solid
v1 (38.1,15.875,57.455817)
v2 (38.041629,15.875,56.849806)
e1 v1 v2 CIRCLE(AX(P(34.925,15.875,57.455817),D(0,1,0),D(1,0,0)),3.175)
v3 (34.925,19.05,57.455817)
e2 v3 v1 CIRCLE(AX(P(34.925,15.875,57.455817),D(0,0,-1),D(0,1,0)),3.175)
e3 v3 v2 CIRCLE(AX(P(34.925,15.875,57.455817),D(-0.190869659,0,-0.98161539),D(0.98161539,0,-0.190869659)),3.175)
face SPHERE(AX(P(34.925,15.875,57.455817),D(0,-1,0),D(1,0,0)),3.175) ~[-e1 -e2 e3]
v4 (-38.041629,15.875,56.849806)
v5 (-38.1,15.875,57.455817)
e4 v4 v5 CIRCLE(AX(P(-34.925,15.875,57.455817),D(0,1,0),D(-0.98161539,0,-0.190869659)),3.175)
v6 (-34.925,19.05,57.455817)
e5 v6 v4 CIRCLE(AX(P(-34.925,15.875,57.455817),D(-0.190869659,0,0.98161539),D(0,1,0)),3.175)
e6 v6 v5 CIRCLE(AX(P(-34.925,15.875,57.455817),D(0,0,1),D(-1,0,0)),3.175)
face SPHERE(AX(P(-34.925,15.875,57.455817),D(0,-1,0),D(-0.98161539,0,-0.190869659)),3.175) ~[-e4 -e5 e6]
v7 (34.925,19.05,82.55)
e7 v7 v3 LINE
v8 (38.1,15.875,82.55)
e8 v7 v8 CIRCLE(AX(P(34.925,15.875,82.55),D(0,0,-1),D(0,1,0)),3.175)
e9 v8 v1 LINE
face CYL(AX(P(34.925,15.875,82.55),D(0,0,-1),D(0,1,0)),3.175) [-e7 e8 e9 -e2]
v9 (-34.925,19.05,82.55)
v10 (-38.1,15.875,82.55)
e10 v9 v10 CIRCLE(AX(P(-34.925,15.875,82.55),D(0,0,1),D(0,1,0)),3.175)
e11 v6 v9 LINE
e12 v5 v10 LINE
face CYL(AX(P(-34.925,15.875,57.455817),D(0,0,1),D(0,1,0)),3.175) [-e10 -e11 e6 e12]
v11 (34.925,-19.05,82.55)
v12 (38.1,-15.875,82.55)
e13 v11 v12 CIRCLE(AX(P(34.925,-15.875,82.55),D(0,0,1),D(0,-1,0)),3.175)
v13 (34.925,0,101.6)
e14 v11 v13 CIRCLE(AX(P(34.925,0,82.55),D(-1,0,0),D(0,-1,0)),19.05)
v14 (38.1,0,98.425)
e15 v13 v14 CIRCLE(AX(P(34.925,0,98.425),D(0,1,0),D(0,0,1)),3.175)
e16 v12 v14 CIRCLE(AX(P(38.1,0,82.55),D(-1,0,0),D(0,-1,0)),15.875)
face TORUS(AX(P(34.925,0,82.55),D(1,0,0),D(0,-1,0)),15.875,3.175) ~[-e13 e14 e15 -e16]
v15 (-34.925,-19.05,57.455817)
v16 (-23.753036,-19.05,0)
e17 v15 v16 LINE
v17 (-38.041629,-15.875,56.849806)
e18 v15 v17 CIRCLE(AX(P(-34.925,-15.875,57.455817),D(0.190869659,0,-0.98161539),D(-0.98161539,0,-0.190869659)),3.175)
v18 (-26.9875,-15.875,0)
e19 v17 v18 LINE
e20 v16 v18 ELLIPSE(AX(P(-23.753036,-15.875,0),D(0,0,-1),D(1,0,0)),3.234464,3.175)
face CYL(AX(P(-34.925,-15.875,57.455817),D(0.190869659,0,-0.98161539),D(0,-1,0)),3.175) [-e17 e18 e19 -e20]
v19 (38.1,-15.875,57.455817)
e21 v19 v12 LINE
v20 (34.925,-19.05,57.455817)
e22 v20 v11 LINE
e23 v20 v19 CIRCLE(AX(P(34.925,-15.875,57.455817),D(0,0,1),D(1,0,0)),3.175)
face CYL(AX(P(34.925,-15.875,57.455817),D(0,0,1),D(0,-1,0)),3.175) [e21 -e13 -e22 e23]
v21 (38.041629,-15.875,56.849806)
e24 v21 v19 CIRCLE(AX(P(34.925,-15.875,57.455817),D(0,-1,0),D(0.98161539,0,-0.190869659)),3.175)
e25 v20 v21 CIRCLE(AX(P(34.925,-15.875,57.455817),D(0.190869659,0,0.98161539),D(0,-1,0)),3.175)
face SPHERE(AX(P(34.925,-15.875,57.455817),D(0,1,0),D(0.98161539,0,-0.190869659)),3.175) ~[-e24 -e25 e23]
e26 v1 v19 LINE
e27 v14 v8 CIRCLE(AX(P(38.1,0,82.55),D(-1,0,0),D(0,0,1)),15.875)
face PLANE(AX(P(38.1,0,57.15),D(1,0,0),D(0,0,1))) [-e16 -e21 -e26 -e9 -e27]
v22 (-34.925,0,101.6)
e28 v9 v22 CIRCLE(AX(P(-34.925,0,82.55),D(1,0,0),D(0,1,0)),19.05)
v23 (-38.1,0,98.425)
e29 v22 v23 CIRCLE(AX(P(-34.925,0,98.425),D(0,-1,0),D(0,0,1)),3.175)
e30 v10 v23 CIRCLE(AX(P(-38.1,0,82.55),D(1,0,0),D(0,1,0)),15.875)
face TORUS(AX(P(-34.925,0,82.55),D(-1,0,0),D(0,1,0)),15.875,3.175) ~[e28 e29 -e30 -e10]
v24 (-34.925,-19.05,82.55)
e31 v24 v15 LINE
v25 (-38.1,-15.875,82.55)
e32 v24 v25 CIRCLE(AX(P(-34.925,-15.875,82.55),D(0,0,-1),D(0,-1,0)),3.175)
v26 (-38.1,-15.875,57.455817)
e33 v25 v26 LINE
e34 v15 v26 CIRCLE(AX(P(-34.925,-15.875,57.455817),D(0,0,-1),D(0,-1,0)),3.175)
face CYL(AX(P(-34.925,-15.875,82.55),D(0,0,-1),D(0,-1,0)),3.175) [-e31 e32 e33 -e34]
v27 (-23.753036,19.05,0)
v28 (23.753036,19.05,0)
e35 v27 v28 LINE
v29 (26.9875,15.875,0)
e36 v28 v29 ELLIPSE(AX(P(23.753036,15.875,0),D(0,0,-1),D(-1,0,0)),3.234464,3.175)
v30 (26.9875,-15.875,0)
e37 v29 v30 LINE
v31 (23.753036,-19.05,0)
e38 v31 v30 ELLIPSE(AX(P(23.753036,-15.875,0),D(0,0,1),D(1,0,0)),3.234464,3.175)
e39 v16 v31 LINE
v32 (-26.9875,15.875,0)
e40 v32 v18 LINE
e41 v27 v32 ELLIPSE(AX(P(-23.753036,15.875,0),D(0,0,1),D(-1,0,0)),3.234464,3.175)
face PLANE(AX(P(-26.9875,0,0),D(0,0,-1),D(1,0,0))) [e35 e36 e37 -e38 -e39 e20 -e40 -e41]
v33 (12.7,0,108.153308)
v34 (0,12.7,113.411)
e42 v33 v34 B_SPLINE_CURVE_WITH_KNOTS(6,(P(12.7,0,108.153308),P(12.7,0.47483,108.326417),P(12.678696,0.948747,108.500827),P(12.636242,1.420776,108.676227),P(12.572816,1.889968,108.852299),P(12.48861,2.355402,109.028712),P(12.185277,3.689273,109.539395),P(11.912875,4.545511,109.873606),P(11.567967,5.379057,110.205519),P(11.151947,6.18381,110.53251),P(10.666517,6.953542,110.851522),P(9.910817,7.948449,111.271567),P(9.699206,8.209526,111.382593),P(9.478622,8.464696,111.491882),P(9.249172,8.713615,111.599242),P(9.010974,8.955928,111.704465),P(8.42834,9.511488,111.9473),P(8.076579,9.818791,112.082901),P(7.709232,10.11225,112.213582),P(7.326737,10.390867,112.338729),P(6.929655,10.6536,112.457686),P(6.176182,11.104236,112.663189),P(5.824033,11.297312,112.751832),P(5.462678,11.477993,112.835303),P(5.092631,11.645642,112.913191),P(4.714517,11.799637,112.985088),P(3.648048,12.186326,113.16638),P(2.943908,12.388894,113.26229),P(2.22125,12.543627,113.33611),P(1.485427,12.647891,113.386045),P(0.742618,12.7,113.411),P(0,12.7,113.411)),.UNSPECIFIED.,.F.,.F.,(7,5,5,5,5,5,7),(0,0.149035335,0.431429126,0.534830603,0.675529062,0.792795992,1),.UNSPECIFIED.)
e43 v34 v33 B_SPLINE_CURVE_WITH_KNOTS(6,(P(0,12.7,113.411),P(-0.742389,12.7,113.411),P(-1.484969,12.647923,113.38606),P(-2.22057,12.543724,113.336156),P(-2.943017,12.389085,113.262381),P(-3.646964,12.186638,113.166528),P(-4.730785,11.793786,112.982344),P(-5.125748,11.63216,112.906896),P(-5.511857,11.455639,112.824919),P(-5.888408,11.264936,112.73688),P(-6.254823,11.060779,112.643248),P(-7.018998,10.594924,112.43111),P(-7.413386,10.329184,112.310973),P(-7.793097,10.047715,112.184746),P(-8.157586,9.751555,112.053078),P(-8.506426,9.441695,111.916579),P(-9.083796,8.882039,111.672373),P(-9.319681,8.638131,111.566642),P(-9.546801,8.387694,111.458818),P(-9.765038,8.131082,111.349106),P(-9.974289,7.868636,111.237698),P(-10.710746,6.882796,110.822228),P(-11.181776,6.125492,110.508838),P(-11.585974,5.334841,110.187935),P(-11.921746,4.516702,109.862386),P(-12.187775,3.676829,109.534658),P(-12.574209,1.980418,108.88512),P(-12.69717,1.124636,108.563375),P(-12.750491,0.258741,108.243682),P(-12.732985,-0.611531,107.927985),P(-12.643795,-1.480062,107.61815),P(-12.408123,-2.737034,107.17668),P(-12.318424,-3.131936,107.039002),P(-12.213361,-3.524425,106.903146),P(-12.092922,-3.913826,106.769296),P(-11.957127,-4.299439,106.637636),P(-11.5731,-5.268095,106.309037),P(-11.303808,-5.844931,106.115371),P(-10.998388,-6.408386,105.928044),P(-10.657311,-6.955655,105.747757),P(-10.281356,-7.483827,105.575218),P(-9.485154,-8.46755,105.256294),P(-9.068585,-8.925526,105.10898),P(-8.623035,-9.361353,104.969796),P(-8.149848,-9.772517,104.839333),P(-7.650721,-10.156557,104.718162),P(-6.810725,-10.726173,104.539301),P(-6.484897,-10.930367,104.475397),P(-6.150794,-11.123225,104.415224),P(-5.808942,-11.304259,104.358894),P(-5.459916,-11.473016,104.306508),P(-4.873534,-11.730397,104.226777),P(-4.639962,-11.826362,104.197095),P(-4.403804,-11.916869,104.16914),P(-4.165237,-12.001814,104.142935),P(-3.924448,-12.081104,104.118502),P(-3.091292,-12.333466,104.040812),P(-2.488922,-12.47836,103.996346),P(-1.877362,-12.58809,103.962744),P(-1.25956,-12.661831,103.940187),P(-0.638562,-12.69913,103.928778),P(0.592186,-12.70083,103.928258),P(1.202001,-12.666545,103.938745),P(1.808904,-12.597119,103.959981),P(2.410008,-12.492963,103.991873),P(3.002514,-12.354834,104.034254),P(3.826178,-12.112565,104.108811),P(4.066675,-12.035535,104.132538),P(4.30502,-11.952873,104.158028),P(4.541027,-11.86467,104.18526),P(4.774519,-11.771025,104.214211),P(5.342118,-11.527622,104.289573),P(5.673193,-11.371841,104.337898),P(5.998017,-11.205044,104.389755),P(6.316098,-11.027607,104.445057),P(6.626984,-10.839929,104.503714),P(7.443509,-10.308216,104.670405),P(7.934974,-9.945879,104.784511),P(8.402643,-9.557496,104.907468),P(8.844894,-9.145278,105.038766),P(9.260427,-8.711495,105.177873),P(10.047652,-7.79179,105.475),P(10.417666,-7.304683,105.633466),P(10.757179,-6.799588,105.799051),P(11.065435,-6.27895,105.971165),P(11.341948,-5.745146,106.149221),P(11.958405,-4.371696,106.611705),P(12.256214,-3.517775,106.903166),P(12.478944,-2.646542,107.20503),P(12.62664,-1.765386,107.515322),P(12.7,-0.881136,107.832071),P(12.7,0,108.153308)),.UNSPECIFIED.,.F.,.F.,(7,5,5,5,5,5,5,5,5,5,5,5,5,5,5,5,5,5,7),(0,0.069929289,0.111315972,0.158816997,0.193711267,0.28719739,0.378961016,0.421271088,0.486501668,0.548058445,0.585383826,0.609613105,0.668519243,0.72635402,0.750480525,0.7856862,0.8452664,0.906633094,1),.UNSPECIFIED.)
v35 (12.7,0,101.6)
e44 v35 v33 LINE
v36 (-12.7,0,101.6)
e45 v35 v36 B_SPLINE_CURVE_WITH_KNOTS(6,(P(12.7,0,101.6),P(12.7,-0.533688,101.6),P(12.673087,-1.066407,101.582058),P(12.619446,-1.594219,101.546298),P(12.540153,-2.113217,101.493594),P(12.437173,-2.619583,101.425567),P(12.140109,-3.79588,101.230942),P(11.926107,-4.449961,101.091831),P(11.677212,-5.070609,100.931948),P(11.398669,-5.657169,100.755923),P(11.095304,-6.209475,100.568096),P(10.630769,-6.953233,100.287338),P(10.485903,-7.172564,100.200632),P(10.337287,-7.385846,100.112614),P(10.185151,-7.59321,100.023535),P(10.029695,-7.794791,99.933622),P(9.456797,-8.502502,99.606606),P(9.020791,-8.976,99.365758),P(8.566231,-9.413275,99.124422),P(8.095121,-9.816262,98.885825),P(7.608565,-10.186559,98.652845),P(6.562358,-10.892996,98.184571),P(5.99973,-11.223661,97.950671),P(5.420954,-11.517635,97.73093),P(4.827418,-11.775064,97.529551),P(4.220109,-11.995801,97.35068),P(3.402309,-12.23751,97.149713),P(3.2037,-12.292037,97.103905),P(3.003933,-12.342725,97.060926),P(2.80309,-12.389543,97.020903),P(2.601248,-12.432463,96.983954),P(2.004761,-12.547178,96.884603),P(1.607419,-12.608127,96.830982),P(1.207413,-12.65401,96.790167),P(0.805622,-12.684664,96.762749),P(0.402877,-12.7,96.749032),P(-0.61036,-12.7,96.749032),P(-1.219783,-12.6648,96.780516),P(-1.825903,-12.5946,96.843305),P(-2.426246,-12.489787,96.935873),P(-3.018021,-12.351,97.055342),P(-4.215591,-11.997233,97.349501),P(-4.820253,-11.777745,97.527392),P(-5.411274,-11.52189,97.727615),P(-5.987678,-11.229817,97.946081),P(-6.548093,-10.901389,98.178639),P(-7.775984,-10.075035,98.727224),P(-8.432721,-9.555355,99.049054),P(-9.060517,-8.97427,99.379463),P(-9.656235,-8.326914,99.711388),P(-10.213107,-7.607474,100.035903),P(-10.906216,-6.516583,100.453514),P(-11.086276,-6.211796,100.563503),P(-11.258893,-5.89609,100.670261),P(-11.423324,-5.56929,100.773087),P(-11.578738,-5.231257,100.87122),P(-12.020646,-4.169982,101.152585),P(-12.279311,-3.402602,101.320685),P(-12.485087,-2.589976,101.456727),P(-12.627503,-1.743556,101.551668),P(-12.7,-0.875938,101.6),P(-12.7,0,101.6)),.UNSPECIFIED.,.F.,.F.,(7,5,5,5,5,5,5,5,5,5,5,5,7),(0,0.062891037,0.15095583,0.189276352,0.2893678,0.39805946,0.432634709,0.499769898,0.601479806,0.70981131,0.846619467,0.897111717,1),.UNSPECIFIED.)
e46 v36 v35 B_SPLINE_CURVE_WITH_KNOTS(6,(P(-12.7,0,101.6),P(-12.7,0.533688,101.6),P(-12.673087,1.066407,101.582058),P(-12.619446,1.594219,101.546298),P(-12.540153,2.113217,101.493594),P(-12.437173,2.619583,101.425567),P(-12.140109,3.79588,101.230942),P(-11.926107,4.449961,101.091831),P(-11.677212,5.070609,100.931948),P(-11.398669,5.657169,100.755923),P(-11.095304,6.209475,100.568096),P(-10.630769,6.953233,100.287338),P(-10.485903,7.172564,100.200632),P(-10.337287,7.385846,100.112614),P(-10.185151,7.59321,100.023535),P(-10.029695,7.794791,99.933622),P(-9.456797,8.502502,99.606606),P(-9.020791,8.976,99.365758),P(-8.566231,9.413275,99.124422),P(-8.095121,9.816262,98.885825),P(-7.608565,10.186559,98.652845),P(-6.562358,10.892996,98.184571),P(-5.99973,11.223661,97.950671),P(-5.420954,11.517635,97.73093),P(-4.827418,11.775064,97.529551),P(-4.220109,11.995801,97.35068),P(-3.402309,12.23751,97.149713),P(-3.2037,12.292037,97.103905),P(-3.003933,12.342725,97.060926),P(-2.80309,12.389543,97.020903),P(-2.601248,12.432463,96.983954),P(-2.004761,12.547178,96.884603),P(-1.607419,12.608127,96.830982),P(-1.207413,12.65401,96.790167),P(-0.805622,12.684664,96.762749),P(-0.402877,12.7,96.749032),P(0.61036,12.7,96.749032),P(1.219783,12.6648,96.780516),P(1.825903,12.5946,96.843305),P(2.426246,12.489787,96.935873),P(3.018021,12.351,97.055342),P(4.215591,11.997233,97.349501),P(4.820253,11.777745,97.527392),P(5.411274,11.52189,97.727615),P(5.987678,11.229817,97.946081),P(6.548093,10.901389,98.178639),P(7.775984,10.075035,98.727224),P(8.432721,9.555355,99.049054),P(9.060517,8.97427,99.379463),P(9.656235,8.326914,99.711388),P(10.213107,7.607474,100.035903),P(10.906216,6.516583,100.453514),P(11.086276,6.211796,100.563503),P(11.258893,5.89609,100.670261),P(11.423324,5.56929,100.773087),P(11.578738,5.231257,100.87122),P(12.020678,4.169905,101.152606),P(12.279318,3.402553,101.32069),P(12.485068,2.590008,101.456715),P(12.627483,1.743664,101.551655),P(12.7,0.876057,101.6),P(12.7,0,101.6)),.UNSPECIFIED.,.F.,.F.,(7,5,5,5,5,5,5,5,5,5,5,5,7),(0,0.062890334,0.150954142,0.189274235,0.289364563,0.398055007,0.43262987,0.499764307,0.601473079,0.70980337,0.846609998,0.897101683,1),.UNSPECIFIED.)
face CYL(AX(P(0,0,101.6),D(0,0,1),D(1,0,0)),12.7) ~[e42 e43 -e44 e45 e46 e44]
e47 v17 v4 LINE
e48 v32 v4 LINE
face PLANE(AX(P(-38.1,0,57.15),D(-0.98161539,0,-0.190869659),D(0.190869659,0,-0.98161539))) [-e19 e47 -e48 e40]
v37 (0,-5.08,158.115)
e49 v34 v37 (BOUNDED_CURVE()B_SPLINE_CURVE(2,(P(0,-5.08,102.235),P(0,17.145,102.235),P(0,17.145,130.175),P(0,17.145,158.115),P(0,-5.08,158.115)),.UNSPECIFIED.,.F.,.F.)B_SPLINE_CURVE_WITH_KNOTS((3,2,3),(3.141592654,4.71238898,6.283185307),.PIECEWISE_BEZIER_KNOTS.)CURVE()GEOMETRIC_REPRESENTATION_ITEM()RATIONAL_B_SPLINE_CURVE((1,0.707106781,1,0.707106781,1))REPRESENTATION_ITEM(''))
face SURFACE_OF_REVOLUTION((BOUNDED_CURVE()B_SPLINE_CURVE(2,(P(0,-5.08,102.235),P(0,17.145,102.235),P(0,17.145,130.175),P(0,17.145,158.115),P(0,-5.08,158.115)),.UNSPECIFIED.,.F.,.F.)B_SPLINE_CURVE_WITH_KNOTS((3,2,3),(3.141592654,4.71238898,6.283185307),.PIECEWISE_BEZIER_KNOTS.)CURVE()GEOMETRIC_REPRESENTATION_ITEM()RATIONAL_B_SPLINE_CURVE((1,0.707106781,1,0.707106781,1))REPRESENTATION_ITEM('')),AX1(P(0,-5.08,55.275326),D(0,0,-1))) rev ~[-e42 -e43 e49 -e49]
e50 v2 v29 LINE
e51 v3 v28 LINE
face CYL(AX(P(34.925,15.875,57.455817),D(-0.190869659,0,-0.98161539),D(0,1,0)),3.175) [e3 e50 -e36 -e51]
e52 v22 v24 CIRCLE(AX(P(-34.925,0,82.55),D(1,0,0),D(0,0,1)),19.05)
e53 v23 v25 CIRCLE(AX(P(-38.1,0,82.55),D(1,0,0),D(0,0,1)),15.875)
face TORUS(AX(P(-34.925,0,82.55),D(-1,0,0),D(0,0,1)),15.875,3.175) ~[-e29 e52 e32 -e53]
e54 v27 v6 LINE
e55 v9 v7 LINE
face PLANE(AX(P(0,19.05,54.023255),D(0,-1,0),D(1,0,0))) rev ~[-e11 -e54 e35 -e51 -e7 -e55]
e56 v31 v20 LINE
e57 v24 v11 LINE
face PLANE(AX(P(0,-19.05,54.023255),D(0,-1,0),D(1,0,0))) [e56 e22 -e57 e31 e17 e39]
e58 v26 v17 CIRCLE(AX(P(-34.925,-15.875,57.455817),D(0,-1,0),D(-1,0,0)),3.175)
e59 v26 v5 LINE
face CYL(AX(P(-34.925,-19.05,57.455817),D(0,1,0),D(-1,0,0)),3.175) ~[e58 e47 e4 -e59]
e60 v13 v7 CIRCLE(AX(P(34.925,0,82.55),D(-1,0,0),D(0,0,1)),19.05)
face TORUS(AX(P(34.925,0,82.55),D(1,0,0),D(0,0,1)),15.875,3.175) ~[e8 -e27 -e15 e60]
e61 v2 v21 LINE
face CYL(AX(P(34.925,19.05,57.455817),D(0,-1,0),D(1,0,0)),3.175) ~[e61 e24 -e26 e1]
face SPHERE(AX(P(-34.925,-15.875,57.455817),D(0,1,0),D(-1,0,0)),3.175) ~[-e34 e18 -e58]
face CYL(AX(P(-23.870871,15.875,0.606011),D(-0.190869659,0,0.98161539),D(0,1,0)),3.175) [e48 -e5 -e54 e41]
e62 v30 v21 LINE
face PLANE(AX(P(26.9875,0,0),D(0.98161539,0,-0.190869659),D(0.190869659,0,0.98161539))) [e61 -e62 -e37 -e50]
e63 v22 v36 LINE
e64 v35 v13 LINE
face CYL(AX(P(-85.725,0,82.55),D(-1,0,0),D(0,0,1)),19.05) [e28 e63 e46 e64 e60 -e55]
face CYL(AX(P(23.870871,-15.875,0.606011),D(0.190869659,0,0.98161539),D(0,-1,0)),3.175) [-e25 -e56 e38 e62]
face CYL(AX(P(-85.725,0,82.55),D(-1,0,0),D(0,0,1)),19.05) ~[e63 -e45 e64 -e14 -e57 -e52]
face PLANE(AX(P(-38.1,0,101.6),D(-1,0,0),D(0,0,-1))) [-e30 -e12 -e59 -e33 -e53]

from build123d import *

# Parameters (mm, degrees)
F1_DEPTH    = 19.05
F2_T1_DEPTH = 171.45
F3_W        = 12.7
F3_H        = 38.1
F7_R        = 3.175
F8_R        = 3.175


# Not quite as in the source:
# - a fillet or chamfer that OpenCascade refuses, or shapes differently, is made with other operations: its cross-section is extruded or revolved along the edge and cut away or added


with BuildPart() as f1:
    # F0 (on Front) → F1 (new body, symmetric)
    with BuildSketch(Plane.XZ):
        Polygon((-38.1, 57.15), (-26.9875, 0), (26.9875, 0), (38.1, 57.15), (38.1, 101.6), (-38.1, 101.6), align=None)
    extrude(amount=F1_DEPTH, both=True)

    # F2: fillet of radius 19.05 on 2 edges, made by hand

    # F2_s2 → F2_t1 (cut)
    with BuildSketch(Plane.YZ.offset(-85.725)):
        with BuildLine():
            ThreePointArc((0, 101.6), (-13.4703841816, 96.0203841816), (-19.05, 82.55))
            Line((-19.05, 82.55), (-19.05, 101.6))
            Line((-19.05, 101.6), (0, 101.6))
        make_face()
        with BuildLine():
            ThreePointArc((0, 101.6), (13.4703841816, 96.0203841816), (19.05, 82.55))
            Line((19.05, 82.55), (19.05, 101.6))
            Line((19.05, 101.6), (0, 101.6))
        make_face()
    extrude(amount=F2_T1_DEPTH, mode=Mode.SUBTRACT)

    # F3 (on Front) → F4 (revolve)
    with BuildSketch(Plane.XZ):
        with Locations((6.35, 101.6)):
            Rectangle(F3_W, F3_H)
    revolve(axis=Axis((0, 0, 41.275), (0, 0, -1)))

    # F5 (on Right) → F6 (revolve)
    with BuildSketch(Plane.YZ):
        with BuildLine():
            Line((-5.08, 158.115), (-5.08, 102.235))
            add(Edge.make_bspline(
                [(-5.08, 102.235), (17.145, 102.235), (17.145, 130.175), (17.145, 158.115), (-5.08, 158.115)],
                knots=[3.1415926536, 3.1415926536, 3.1415926536, 4.7123889804, 4.7123889804, 6.2831853072, 6.2831853072, 6.2831853072], degree=2, weights=[1, 0.7071067812, 1, 0.7071067812, 1]))
        make_face()
    revolve(axis=Axis((0, -5.08, 55.275326029), (0, 0, -1)))

    # F7
    f7_edges = [f1.edges().sort_by_distance(p)[0] for p in [
        (-38.1, 0, 57.15),
        (38.1, 0, 57.15),
    ]]
    fillet(f7_edges, radius=F7_R)

    # F8
    f8_edges = [f1.edges().sort_by_distance(p)[0] for p in [
        (32.514564, -19.05, 28.424903),
        (-32.514564, -19.05, 28.424903),
        (-32.514564, 19.05, 28.424903),
        (-38.1, 19.05, 70.002908),
        (-38.085374, 19.05, 57.151409),
        (38.1, 19.05, 70.002908),
        (38.085374, 19.05, 57.151409),
        (32.514564, 19.05, 28.424903),
        (-38.085374, -19.05, 57.151409),
        (-38.1, -19.05, 70.002908),
        (38.1, -19.05, 70.002908),
        (38.085374, -19.05, 57.151409),
        (-38.1, -13.470384, 96.020384),
        (-38.1, 13.470384, 96.020384),
        (38.1, 13.470384, 96.020384),
        (38.1, -13.470384, 96.020384),
    ]]
    fillet(f8_edges, radius=F8_R)


solid = f1.part
